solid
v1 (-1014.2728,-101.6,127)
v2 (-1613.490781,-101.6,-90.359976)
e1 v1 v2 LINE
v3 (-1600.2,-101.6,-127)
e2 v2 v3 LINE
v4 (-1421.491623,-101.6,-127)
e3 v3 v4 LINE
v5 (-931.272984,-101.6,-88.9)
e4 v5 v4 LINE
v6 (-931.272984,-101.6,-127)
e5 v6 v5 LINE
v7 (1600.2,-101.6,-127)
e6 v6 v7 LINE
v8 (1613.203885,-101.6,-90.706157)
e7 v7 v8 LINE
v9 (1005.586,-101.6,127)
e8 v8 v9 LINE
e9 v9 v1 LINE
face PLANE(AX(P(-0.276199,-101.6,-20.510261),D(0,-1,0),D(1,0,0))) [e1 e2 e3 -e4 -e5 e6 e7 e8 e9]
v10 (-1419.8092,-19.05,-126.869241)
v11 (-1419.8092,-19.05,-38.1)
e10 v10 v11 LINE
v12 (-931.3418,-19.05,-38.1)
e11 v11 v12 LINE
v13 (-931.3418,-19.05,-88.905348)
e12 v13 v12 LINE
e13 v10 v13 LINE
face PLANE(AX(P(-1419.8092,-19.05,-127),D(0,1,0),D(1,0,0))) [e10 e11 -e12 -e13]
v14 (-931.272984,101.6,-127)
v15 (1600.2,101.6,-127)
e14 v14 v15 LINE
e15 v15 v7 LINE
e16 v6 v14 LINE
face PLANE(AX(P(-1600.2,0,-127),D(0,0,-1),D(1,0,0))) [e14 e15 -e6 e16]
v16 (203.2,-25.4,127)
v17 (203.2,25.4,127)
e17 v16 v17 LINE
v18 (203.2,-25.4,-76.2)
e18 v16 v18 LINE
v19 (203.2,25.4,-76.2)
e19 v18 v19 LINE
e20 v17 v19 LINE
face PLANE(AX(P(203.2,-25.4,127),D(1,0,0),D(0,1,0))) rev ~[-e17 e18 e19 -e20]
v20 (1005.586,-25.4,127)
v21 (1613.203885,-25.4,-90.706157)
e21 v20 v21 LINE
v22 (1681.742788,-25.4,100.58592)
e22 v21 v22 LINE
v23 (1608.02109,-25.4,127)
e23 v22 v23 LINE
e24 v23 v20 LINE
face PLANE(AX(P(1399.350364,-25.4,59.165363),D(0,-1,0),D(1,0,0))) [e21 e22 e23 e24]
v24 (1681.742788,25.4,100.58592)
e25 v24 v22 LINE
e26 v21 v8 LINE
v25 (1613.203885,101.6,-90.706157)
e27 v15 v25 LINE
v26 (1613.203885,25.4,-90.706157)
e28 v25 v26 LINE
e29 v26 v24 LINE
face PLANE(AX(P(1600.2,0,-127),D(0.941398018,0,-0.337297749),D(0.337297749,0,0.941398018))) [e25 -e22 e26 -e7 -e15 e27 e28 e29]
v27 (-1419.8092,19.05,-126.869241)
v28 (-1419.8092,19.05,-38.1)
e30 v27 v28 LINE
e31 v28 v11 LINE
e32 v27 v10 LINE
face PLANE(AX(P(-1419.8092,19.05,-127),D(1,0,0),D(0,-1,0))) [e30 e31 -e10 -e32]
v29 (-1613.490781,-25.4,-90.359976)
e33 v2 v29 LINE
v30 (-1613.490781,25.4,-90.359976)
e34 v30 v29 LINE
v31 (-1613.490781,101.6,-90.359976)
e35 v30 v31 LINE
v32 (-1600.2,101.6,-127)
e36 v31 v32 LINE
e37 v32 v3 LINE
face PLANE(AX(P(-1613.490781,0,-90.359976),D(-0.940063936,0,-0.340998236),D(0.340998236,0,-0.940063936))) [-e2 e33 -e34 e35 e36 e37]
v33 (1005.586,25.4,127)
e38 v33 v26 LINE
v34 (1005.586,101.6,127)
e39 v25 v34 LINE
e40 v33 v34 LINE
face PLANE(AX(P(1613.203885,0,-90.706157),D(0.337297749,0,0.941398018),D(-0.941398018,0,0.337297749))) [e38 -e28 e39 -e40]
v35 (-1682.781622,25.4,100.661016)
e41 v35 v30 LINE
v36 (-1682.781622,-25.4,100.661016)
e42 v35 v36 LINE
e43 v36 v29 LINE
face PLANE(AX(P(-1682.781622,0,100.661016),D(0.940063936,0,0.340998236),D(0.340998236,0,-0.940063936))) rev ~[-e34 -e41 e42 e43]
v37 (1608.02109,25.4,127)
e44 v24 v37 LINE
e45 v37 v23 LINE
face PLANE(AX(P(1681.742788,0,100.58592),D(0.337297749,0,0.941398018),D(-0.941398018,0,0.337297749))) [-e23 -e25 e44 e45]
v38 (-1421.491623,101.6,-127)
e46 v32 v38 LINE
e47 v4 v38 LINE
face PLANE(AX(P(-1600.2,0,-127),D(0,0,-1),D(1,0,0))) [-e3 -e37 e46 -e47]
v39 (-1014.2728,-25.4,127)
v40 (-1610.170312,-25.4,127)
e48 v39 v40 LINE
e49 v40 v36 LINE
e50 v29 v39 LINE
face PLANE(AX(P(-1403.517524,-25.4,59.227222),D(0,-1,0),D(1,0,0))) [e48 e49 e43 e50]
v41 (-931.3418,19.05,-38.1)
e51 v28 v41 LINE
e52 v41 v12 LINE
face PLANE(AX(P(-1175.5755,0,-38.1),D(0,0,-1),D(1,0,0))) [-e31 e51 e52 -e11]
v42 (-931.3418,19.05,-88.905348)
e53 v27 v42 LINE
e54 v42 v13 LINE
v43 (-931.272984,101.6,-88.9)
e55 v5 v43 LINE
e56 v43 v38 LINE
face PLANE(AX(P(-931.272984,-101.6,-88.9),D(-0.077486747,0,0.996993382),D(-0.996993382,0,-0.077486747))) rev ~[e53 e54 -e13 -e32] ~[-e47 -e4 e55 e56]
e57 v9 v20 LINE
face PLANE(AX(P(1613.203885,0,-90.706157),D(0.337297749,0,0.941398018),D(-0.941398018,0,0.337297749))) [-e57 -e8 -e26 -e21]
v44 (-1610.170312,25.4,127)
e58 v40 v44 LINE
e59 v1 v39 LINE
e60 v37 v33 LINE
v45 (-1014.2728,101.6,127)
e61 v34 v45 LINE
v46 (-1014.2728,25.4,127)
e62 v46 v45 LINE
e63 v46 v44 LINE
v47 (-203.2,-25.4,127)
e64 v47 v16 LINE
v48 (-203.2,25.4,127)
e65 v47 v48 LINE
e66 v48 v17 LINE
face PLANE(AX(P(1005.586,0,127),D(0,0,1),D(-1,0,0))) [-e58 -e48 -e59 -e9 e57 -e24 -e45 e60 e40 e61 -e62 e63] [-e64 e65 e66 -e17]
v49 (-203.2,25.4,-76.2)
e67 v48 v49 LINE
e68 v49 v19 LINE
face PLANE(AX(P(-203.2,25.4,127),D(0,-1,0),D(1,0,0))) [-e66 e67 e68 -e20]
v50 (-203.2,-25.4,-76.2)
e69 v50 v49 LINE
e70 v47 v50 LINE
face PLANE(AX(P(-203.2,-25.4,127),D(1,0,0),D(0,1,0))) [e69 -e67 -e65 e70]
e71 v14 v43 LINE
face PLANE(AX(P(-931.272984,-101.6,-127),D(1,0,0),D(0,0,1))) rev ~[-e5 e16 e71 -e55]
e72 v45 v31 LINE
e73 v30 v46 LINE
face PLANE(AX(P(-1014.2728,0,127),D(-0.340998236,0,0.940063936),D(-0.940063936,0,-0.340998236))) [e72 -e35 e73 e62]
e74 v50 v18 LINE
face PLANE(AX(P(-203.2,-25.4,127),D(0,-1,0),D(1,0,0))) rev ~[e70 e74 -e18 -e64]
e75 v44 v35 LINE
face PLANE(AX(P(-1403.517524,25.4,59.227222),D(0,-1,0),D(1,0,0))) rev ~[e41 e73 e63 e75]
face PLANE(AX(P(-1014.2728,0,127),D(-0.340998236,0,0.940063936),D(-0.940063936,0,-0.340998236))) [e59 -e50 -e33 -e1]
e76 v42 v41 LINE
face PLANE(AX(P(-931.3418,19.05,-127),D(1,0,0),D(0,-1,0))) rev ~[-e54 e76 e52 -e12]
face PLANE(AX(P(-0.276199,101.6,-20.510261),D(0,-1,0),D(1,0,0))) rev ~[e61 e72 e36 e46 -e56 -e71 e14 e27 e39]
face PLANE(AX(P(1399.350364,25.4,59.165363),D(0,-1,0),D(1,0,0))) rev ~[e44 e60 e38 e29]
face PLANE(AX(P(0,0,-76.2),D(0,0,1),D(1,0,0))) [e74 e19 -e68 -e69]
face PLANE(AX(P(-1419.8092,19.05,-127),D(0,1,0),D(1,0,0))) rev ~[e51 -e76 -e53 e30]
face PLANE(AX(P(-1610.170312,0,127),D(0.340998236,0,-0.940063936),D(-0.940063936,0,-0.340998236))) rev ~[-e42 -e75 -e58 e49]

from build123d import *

# Parameters (mm, degrees)
F1_DEPTH = 101.6
F2_DEPTH = 25.4
F3_W     = 406.4
F3_H     = 50.8
F4_DEPTH = 203.2
F5_W     = 488.4674
F5_H     = 38.1
F6_DEPTH = 88.9
F8_DEPTH = 203.2


# Not quite as in the source:
# - a feature names something its author has since deleted; it is built from what else it names


with BuildPart() as f1:
    # F0 (on Front) → F1 (new body, symmetric)
    with BuildSketch(Plane.XZ):
        Polygon((-1613.4907807573, -90.3599756084), (-1600.2, -127), (1600.2, -127), (1613.2038848964, -90.7061572542), (1072.3230234564, 103.0884903417), (1005.586, 127), (-1014.2728, 127), (-1080.098633757, 103.1223760313), align=None)
    extrude(amount=F1_DEPTH, both=True)

    # F0 (on Front) → F2 (join, symmetric)
    with BuildSketch(Plane.XZ):
        Polygon((-1088.7599889401, 127), (-1610.1703115208, 127), (-1682.781622222, 100.6610161415), (-1613.4907807573, -90.3599756084), (-1080.098633757, 103.1223760313), align=None)
        Polygon((1072.3230234564, 103.0884903417), (1613.2038848964, -90.7061572542), (1681.7427875358, 100.5859200125), (1608.0210902906, 127), (1080.8903862863, 127), align=None)
        Polygon((1080.8903862863, 127), (1005.586, 127), (1072.3230234564, 103.0884903417), align=None)
        Polygon((-1014.2728, 127), (-1088.7599889401, 127), (-1080.098633757, 103.1223760313), align=None)
    extrude(amount=F2_DEPTH, both=True)

    # F3 (on face) → F4 (cut)
    with BuildSketch(Plane.XY.offset(127)):
        Rectangle(F3_W, F3_H)
    extrude(amount=-F4_DEPTH, mode=Mode.SUBTRACT)

    # F5 (on face) → F6 (cut)
    with BuildSketch(Plane(origin=(0, 0, -127), x_dir=(1, 0, 0), z_dir=(0, 0, -1))):
        with Locations((-1175.5755, 0)):
            Rectangle(F5_W, F5_H)
    extrude(amount=-F6_DEPTH, mode=Mode.SUBTRACT)

    # F7 (on face) → F8 (cut)
    with BuildSketch(Plane.XZ.offset(101.6)):
        Polygon((-1421.4916229248, -127), (-931.272983551, -127), (-931.272983551, -88.9), align=None)
    extrude(amount=-F8_DEPTH, mode=Mode.SUBTRACT)


solid = f1.part
